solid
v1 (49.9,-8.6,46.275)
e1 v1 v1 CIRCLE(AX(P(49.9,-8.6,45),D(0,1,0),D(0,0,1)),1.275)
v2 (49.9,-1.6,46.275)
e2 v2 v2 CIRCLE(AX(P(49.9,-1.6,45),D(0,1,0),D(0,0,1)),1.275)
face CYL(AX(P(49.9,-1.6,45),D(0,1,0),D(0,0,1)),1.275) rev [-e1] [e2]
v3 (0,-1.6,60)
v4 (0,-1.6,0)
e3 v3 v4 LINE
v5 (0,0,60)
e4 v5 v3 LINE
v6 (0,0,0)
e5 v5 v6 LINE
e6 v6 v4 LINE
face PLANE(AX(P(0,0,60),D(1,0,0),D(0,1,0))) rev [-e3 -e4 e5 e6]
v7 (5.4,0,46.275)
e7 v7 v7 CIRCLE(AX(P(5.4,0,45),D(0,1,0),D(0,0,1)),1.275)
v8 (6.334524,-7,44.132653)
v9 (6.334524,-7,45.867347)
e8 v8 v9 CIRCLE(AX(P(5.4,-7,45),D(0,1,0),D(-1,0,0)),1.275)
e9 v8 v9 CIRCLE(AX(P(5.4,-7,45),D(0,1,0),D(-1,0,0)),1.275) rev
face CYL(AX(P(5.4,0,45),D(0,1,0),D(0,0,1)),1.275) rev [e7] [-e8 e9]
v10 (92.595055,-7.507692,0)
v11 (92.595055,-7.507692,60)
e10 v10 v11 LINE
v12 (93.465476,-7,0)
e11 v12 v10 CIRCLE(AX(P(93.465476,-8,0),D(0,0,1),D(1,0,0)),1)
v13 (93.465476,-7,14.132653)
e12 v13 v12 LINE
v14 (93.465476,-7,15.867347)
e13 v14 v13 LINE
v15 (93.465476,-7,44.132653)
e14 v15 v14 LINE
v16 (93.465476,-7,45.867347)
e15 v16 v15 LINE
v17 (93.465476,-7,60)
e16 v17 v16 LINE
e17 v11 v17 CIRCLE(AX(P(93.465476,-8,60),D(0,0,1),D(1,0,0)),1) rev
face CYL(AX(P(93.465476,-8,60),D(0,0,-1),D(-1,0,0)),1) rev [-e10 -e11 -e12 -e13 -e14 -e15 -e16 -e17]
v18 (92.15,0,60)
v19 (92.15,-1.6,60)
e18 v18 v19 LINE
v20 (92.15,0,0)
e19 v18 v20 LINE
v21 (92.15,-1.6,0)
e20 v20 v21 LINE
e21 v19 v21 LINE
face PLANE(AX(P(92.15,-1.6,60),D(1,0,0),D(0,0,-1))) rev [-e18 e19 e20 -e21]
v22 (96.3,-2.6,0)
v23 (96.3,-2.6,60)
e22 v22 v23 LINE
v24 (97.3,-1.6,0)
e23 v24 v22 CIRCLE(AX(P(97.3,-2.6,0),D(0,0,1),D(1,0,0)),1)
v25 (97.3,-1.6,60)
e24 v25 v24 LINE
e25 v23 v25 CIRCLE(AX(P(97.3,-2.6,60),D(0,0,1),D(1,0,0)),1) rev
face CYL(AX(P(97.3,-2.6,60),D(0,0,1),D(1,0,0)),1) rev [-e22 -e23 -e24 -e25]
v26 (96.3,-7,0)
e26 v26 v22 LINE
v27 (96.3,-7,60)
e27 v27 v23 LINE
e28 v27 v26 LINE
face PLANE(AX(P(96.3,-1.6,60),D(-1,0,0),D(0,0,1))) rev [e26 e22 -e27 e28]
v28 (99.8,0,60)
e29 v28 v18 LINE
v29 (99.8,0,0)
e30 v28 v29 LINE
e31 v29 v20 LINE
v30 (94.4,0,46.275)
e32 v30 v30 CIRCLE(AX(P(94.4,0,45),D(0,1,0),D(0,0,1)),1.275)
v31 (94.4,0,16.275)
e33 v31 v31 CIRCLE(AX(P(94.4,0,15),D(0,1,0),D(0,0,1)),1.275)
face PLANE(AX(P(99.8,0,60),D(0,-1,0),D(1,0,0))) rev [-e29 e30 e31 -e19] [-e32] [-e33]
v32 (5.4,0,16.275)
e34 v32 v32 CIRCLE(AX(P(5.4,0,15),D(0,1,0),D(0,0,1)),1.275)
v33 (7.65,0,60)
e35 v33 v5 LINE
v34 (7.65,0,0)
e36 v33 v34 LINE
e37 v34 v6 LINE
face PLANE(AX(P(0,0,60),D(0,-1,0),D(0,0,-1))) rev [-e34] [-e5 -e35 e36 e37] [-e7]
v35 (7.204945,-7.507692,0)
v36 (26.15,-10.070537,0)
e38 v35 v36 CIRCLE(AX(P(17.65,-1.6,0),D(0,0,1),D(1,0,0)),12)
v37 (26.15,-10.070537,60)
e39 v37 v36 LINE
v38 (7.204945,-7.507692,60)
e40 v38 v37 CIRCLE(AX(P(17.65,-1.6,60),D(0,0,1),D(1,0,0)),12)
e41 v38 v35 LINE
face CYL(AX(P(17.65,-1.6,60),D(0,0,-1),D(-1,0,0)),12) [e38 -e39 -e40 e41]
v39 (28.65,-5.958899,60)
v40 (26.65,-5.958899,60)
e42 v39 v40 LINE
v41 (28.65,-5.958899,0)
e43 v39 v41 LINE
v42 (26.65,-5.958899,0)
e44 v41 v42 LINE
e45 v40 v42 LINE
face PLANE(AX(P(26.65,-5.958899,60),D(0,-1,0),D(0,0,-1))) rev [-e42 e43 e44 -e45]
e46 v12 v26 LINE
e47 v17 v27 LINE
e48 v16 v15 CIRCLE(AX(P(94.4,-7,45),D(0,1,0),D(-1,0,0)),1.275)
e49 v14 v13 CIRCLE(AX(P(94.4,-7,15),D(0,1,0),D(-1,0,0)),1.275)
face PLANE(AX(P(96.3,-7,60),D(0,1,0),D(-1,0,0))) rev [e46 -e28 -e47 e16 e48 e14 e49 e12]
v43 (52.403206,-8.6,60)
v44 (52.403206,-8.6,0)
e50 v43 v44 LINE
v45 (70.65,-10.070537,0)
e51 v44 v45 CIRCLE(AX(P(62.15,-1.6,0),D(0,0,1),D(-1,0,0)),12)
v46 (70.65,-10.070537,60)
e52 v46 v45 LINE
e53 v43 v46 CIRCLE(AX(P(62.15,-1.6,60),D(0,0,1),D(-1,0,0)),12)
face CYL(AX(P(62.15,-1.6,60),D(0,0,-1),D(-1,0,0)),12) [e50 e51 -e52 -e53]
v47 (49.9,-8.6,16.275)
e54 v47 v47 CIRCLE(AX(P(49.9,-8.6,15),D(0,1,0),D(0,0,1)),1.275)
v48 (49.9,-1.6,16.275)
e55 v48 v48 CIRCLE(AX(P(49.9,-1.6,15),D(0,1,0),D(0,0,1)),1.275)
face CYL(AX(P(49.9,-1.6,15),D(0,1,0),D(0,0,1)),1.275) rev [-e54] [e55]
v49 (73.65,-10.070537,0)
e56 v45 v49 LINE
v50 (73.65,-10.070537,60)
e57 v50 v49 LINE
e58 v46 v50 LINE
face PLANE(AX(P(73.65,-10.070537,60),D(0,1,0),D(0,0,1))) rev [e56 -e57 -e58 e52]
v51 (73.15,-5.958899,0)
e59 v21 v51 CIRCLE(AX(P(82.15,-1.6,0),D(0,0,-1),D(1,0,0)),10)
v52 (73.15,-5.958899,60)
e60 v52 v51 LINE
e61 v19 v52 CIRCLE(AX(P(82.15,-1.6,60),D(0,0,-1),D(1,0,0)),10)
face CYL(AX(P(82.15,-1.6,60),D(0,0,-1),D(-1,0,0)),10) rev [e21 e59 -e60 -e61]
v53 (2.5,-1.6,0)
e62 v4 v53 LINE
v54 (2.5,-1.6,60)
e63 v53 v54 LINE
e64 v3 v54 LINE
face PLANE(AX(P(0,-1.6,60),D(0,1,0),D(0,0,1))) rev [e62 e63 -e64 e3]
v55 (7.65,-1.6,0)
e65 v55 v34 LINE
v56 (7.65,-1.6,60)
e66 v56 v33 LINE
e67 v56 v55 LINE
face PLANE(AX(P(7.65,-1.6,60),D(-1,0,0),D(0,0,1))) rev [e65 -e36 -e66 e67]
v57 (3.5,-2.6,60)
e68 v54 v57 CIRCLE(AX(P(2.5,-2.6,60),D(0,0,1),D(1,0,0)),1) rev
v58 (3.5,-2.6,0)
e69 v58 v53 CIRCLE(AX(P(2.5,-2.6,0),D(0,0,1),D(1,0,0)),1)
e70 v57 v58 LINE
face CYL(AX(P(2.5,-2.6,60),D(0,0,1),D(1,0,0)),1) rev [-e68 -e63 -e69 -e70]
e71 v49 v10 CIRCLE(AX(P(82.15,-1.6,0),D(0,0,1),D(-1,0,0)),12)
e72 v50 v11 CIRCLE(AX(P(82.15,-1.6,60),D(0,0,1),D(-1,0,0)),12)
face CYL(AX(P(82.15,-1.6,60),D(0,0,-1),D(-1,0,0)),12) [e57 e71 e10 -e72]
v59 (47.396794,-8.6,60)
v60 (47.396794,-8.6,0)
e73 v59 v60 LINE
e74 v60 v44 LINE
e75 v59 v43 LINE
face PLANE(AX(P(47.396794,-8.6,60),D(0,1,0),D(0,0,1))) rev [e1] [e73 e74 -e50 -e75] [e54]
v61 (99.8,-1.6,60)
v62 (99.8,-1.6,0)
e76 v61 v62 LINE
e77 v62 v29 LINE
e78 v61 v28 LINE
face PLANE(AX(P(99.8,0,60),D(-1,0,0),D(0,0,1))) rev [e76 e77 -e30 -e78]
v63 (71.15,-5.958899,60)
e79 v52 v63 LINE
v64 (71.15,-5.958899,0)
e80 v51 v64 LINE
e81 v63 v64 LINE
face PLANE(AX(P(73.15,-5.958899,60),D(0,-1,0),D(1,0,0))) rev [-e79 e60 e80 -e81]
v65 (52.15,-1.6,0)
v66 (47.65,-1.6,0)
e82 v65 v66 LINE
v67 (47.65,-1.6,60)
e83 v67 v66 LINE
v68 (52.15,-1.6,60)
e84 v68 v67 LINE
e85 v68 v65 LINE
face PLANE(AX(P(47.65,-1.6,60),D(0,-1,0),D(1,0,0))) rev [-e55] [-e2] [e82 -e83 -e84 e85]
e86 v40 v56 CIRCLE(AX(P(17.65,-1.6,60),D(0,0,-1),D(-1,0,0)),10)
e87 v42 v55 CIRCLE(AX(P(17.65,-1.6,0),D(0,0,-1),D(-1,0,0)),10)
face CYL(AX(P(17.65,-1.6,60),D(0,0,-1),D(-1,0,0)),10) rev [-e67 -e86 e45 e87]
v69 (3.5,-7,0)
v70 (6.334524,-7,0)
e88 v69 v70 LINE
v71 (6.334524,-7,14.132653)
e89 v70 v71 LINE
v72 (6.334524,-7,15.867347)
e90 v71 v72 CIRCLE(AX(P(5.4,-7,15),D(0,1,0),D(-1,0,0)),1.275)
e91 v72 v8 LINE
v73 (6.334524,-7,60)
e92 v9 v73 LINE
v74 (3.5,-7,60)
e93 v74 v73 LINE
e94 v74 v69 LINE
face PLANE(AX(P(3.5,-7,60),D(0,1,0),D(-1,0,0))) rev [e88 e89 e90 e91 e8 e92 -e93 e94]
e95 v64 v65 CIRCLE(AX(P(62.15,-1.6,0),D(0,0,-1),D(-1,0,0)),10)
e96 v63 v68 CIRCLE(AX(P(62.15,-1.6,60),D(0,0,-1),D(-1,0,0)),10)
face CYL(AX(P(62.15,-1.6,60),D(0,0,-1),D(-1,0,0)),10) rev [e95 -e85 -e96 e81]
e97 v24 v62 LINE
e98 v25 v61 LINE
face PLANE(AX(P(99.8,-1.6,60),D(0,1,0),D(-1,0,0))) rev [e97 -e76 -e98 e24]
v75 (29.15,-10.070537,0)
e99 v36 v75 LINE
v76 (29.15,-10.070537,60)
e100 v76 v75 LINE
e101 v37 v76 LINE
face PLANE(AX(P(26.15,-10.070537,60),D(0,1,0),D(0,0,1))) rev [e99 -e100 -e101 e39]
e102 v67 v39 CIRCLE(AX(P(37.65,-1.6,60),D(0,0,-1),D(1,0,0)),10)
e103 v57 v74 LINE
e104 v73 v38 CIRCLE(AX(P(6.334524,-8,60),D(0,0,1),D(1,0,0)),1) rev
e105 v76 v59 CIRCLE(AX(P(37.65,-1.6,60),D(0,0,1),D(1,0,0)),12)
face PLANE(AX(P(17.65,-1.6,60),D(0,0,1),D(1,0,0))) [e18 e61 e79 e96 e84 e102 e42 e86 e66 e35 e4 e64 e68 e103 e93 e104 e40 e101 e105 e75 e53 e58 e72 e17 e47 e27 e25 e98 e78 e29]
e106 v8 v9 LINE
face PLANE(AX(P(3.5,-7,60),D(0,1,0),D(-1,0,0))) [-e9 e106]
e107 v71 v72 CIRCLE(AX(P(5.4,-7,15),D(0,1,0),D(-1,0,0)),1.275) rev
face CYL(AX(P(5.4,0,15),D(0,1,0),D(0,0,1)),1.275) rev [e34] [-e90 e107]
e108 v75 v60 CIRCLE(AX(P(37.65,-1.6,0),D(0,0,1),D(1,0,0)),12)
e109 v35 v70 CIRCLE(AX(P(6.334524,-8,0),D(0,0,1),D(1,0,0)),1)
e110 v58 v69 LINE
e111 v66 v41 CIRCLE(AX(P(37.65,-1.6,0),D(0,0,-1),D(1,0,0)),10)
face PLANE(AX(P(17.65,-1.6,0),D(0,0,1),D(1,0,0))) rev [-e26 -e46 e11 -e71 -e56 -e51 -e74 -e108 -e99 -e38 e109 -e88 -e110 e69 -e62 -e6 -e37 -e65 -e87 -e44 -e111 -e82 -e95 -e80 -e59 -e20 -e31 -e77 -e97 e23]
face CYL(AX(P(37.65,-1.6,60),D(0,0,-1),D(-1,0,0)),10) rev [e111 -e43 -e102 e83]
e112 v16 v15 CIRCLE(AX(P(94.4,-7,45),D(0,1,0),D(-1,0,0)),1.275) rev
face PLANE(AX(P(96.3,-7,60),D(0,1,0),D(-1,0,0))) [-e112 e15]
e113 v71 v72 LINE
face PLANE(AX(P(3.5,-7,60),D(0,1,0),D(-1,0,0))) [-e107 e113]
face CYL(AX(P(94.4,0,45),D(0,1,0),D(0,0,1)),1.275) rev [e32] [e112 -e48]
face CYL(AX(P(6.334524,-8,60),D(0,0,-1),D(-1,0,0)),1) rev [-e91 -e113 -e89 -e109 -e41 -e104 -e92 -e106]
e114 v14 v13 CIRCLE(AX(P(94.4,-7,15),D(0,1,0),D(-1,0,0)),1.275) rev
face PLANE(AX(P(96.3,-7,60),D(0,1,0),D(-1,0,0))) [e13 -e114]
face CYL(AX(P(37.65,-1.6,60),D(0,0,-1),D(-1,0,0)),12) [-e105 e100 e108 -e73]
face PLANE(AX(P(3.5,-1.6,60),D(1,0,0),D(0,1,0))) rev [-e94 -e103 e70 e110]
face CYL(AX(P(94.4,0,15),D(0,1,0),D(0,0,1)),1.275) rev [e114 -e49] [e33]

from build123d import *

# Parameters (mm, degrees)
BOSS_EXTRUDE1_DEPTH                         = 60
FILLET1_R                                   = 1
TAPPED_START                                = -7
TAPPED_HOLE_FOR_M2_5X0_45_HELICOIL1_OUTL_R  = 1.275
TAPPED_HOLE_FOR_M2_5X0_45_HELICOIL1_DEPTH   = 7
TAPPED_START_2                              = -8.6
TAPPED_HOLE_FOR_M2_5X0_45_HELICOIL1_2_OU_R  = 1.275
TAPPED_HOLE_FOR_M2_5X0_45_HELICOIL1_2_DEPTH = 1.6


# Read off the part's stored shape, not the designer's step: Tapped Hole for M2.5x0.45 Helicoil1
with BuildPart() as part:
    # Sketch1 → Boss-Extrude1 (new body)
    with BuildSketch(Plane.XY):
        with BuildLine():
            Line((0, 0), (7.65, 0))
            Line((7.65, 0), (7.65, -1.6))
            ThreePointArc((7.65, -1.6), (15.413932023, -11.346794345), (26.65, -5.958898944))
            Line((26.65, -5.958898944), (28.65, -5.958898944))
            ThreePointArc((28.65, -5.958898944), (39.886067977, -11.346794345), (47.65, -1.6))
            Line((47.65, -1.6), (52.15, -1.6))
            ThreePointArc((52.15, -1.6), (59.913932023, -11.346794345), (71.15, -5.958898944))
            Line((71.15, -5.958898944), (73.15, -5.958898944))
            ThreePointArc((73.15, -5.958898944), (84.386067977, -11.346794345), (92.15, -1.6))
            Line((92.15, -1.6), (92.15, 0))
            Line((92.15, 0), (99.8, 0))
            Line((99.8, 0), (99.8, -1.6))
            Line((99.8, -1.6), (96.3, -1.6))
            Line((96.3, -1.6), (96.3, -7))
            Line((96.3, -7), (92.86634266, -7))
            ThreePointArc((92.86634266, -7), (84.043434268, -13.449679602), (73.65, -10.070537173))
            Line((73.65, -10.070537173), (70.65, -10.070537173))
            ThreePointArc((70.65, -10.070537173), (61.186027008, -13.561218837), (52.403205655, -8.6))
            Line((52.403205655, -8.6), (47.396794345, -8.6))
            ThreePointArc((47.396794345, -8.6), (38.613972992, -13.561218837), (29.15, -10.070537173))
            Line((29.15, -10.070537173), (26.15, -10.070537173))
            ThreePointArc((26.15, -10.070537173), (15.756565732, -13.449679602), (6.93365734, -7))
            Line((6.93365734, -7), (3.5, -7))
            Line((3.5, -7), (3.5, -1.6))
            Line((3.5, -1.6), (0, -1.6))
            Line((0, -1.6), (0, 0))
        make_face()
    extrude(amount=BOSS_EXTRUDE1_DEPTH)

    # Fillet1
    fillet1_edges = [part.edges().sort_by_distance(p)[0] for p in [
        (96.3, -1.6, 30),
        (92.86634266, -7, 30),
        (6.93365734, -7, 30),
        (3.5, -1.6, 30),
    ]]
    fillet(fillet1_edges, radius=FILLET1_R)

    # Tapped Hole for M2.5x0.45 Helicoil1 outl → Tapped Hole for M2.5x0.45 Helicoil1 (cut)
    with BuildSketch(Plane(origin=(0, 0, 0), x_dir=(1, 0, 0), z_dir=(0, 1, 0)).offset(TAPPED_START)):
        with Locations((94.4, -15)):
            Circle(TAPPED_HOLE_FOR_M2_5X0_45_HELICOIL1_OUTL_R)
        with Locations((94.4, -45)):
            Circle(TAPPED_HOLE_FOR_M2_5X0_45_HELICOIL1_OUTL_R)
        with Locations((49.9, -15)):
            Circle(TAPPED_HOLE_FOR_M2_5X0_45_HELICOIL1_OUTL_R)
        with Locations((49.9, -45)):
            Circle(TAPPED_HOLE_FOR_M2_5X0_45_HELICOIL1_OUTL_R)
    tapped_hole_for_m2_5x0_45_helicoil1 = extrude(amount=TAPPED_HOLE_FOR_M2_5X0_45_HELICOIL1_DEPTH, mode=Mode.SUBTRACT)

    # Tapped Hole for M2.5x0.45 Helicoil1 2 ou → Tapped Hole for M2.5x0.45 Helicoil1 2 (cut)
    with BuildSketch(Plane(origin=(0, 0, 0), x_dir=(1, 0, 0), z_dir=(0, 1, 0)).offset(TAPPED_START_2)):
        with Locations((49.9, -15)):
            Circle(TAPPED_HOLE_FOR_M2_5X0_45_HELICOIL1_2_OU_R)
        with Locations((49.9, -45)):
            Circle(TAPPED_HOLE_FOR_M2_5X0_45_HELICOIL1_2_OU_R)
    tapped_hole_for_m2_5x0_45_helicoil1_2 = extrude(amount=TAPPED_HOLE_FOR_M2_5X0_45_HELICOIL1_2_DEPTH, mode=Mode.SUBTRACT)

    # Mirror1: Tapped Hole for M2.5x0.45 Helicoil1, Tapped Hole for M2.5x0.45 Helicoil1 2 across plane
    add(tapped_hole_for_m2_5x0_45_helicoil1.mirror(Plane.ZY.offset(-49.9)), mode=Mode.SUBTRACT)
    add(tapped_hole_for_m2_5x0_45_helicoil1_2.mirror(Plane.ZY.offset(-49.9)), mode=Mode.SUBTRACT)


solid = part.part
